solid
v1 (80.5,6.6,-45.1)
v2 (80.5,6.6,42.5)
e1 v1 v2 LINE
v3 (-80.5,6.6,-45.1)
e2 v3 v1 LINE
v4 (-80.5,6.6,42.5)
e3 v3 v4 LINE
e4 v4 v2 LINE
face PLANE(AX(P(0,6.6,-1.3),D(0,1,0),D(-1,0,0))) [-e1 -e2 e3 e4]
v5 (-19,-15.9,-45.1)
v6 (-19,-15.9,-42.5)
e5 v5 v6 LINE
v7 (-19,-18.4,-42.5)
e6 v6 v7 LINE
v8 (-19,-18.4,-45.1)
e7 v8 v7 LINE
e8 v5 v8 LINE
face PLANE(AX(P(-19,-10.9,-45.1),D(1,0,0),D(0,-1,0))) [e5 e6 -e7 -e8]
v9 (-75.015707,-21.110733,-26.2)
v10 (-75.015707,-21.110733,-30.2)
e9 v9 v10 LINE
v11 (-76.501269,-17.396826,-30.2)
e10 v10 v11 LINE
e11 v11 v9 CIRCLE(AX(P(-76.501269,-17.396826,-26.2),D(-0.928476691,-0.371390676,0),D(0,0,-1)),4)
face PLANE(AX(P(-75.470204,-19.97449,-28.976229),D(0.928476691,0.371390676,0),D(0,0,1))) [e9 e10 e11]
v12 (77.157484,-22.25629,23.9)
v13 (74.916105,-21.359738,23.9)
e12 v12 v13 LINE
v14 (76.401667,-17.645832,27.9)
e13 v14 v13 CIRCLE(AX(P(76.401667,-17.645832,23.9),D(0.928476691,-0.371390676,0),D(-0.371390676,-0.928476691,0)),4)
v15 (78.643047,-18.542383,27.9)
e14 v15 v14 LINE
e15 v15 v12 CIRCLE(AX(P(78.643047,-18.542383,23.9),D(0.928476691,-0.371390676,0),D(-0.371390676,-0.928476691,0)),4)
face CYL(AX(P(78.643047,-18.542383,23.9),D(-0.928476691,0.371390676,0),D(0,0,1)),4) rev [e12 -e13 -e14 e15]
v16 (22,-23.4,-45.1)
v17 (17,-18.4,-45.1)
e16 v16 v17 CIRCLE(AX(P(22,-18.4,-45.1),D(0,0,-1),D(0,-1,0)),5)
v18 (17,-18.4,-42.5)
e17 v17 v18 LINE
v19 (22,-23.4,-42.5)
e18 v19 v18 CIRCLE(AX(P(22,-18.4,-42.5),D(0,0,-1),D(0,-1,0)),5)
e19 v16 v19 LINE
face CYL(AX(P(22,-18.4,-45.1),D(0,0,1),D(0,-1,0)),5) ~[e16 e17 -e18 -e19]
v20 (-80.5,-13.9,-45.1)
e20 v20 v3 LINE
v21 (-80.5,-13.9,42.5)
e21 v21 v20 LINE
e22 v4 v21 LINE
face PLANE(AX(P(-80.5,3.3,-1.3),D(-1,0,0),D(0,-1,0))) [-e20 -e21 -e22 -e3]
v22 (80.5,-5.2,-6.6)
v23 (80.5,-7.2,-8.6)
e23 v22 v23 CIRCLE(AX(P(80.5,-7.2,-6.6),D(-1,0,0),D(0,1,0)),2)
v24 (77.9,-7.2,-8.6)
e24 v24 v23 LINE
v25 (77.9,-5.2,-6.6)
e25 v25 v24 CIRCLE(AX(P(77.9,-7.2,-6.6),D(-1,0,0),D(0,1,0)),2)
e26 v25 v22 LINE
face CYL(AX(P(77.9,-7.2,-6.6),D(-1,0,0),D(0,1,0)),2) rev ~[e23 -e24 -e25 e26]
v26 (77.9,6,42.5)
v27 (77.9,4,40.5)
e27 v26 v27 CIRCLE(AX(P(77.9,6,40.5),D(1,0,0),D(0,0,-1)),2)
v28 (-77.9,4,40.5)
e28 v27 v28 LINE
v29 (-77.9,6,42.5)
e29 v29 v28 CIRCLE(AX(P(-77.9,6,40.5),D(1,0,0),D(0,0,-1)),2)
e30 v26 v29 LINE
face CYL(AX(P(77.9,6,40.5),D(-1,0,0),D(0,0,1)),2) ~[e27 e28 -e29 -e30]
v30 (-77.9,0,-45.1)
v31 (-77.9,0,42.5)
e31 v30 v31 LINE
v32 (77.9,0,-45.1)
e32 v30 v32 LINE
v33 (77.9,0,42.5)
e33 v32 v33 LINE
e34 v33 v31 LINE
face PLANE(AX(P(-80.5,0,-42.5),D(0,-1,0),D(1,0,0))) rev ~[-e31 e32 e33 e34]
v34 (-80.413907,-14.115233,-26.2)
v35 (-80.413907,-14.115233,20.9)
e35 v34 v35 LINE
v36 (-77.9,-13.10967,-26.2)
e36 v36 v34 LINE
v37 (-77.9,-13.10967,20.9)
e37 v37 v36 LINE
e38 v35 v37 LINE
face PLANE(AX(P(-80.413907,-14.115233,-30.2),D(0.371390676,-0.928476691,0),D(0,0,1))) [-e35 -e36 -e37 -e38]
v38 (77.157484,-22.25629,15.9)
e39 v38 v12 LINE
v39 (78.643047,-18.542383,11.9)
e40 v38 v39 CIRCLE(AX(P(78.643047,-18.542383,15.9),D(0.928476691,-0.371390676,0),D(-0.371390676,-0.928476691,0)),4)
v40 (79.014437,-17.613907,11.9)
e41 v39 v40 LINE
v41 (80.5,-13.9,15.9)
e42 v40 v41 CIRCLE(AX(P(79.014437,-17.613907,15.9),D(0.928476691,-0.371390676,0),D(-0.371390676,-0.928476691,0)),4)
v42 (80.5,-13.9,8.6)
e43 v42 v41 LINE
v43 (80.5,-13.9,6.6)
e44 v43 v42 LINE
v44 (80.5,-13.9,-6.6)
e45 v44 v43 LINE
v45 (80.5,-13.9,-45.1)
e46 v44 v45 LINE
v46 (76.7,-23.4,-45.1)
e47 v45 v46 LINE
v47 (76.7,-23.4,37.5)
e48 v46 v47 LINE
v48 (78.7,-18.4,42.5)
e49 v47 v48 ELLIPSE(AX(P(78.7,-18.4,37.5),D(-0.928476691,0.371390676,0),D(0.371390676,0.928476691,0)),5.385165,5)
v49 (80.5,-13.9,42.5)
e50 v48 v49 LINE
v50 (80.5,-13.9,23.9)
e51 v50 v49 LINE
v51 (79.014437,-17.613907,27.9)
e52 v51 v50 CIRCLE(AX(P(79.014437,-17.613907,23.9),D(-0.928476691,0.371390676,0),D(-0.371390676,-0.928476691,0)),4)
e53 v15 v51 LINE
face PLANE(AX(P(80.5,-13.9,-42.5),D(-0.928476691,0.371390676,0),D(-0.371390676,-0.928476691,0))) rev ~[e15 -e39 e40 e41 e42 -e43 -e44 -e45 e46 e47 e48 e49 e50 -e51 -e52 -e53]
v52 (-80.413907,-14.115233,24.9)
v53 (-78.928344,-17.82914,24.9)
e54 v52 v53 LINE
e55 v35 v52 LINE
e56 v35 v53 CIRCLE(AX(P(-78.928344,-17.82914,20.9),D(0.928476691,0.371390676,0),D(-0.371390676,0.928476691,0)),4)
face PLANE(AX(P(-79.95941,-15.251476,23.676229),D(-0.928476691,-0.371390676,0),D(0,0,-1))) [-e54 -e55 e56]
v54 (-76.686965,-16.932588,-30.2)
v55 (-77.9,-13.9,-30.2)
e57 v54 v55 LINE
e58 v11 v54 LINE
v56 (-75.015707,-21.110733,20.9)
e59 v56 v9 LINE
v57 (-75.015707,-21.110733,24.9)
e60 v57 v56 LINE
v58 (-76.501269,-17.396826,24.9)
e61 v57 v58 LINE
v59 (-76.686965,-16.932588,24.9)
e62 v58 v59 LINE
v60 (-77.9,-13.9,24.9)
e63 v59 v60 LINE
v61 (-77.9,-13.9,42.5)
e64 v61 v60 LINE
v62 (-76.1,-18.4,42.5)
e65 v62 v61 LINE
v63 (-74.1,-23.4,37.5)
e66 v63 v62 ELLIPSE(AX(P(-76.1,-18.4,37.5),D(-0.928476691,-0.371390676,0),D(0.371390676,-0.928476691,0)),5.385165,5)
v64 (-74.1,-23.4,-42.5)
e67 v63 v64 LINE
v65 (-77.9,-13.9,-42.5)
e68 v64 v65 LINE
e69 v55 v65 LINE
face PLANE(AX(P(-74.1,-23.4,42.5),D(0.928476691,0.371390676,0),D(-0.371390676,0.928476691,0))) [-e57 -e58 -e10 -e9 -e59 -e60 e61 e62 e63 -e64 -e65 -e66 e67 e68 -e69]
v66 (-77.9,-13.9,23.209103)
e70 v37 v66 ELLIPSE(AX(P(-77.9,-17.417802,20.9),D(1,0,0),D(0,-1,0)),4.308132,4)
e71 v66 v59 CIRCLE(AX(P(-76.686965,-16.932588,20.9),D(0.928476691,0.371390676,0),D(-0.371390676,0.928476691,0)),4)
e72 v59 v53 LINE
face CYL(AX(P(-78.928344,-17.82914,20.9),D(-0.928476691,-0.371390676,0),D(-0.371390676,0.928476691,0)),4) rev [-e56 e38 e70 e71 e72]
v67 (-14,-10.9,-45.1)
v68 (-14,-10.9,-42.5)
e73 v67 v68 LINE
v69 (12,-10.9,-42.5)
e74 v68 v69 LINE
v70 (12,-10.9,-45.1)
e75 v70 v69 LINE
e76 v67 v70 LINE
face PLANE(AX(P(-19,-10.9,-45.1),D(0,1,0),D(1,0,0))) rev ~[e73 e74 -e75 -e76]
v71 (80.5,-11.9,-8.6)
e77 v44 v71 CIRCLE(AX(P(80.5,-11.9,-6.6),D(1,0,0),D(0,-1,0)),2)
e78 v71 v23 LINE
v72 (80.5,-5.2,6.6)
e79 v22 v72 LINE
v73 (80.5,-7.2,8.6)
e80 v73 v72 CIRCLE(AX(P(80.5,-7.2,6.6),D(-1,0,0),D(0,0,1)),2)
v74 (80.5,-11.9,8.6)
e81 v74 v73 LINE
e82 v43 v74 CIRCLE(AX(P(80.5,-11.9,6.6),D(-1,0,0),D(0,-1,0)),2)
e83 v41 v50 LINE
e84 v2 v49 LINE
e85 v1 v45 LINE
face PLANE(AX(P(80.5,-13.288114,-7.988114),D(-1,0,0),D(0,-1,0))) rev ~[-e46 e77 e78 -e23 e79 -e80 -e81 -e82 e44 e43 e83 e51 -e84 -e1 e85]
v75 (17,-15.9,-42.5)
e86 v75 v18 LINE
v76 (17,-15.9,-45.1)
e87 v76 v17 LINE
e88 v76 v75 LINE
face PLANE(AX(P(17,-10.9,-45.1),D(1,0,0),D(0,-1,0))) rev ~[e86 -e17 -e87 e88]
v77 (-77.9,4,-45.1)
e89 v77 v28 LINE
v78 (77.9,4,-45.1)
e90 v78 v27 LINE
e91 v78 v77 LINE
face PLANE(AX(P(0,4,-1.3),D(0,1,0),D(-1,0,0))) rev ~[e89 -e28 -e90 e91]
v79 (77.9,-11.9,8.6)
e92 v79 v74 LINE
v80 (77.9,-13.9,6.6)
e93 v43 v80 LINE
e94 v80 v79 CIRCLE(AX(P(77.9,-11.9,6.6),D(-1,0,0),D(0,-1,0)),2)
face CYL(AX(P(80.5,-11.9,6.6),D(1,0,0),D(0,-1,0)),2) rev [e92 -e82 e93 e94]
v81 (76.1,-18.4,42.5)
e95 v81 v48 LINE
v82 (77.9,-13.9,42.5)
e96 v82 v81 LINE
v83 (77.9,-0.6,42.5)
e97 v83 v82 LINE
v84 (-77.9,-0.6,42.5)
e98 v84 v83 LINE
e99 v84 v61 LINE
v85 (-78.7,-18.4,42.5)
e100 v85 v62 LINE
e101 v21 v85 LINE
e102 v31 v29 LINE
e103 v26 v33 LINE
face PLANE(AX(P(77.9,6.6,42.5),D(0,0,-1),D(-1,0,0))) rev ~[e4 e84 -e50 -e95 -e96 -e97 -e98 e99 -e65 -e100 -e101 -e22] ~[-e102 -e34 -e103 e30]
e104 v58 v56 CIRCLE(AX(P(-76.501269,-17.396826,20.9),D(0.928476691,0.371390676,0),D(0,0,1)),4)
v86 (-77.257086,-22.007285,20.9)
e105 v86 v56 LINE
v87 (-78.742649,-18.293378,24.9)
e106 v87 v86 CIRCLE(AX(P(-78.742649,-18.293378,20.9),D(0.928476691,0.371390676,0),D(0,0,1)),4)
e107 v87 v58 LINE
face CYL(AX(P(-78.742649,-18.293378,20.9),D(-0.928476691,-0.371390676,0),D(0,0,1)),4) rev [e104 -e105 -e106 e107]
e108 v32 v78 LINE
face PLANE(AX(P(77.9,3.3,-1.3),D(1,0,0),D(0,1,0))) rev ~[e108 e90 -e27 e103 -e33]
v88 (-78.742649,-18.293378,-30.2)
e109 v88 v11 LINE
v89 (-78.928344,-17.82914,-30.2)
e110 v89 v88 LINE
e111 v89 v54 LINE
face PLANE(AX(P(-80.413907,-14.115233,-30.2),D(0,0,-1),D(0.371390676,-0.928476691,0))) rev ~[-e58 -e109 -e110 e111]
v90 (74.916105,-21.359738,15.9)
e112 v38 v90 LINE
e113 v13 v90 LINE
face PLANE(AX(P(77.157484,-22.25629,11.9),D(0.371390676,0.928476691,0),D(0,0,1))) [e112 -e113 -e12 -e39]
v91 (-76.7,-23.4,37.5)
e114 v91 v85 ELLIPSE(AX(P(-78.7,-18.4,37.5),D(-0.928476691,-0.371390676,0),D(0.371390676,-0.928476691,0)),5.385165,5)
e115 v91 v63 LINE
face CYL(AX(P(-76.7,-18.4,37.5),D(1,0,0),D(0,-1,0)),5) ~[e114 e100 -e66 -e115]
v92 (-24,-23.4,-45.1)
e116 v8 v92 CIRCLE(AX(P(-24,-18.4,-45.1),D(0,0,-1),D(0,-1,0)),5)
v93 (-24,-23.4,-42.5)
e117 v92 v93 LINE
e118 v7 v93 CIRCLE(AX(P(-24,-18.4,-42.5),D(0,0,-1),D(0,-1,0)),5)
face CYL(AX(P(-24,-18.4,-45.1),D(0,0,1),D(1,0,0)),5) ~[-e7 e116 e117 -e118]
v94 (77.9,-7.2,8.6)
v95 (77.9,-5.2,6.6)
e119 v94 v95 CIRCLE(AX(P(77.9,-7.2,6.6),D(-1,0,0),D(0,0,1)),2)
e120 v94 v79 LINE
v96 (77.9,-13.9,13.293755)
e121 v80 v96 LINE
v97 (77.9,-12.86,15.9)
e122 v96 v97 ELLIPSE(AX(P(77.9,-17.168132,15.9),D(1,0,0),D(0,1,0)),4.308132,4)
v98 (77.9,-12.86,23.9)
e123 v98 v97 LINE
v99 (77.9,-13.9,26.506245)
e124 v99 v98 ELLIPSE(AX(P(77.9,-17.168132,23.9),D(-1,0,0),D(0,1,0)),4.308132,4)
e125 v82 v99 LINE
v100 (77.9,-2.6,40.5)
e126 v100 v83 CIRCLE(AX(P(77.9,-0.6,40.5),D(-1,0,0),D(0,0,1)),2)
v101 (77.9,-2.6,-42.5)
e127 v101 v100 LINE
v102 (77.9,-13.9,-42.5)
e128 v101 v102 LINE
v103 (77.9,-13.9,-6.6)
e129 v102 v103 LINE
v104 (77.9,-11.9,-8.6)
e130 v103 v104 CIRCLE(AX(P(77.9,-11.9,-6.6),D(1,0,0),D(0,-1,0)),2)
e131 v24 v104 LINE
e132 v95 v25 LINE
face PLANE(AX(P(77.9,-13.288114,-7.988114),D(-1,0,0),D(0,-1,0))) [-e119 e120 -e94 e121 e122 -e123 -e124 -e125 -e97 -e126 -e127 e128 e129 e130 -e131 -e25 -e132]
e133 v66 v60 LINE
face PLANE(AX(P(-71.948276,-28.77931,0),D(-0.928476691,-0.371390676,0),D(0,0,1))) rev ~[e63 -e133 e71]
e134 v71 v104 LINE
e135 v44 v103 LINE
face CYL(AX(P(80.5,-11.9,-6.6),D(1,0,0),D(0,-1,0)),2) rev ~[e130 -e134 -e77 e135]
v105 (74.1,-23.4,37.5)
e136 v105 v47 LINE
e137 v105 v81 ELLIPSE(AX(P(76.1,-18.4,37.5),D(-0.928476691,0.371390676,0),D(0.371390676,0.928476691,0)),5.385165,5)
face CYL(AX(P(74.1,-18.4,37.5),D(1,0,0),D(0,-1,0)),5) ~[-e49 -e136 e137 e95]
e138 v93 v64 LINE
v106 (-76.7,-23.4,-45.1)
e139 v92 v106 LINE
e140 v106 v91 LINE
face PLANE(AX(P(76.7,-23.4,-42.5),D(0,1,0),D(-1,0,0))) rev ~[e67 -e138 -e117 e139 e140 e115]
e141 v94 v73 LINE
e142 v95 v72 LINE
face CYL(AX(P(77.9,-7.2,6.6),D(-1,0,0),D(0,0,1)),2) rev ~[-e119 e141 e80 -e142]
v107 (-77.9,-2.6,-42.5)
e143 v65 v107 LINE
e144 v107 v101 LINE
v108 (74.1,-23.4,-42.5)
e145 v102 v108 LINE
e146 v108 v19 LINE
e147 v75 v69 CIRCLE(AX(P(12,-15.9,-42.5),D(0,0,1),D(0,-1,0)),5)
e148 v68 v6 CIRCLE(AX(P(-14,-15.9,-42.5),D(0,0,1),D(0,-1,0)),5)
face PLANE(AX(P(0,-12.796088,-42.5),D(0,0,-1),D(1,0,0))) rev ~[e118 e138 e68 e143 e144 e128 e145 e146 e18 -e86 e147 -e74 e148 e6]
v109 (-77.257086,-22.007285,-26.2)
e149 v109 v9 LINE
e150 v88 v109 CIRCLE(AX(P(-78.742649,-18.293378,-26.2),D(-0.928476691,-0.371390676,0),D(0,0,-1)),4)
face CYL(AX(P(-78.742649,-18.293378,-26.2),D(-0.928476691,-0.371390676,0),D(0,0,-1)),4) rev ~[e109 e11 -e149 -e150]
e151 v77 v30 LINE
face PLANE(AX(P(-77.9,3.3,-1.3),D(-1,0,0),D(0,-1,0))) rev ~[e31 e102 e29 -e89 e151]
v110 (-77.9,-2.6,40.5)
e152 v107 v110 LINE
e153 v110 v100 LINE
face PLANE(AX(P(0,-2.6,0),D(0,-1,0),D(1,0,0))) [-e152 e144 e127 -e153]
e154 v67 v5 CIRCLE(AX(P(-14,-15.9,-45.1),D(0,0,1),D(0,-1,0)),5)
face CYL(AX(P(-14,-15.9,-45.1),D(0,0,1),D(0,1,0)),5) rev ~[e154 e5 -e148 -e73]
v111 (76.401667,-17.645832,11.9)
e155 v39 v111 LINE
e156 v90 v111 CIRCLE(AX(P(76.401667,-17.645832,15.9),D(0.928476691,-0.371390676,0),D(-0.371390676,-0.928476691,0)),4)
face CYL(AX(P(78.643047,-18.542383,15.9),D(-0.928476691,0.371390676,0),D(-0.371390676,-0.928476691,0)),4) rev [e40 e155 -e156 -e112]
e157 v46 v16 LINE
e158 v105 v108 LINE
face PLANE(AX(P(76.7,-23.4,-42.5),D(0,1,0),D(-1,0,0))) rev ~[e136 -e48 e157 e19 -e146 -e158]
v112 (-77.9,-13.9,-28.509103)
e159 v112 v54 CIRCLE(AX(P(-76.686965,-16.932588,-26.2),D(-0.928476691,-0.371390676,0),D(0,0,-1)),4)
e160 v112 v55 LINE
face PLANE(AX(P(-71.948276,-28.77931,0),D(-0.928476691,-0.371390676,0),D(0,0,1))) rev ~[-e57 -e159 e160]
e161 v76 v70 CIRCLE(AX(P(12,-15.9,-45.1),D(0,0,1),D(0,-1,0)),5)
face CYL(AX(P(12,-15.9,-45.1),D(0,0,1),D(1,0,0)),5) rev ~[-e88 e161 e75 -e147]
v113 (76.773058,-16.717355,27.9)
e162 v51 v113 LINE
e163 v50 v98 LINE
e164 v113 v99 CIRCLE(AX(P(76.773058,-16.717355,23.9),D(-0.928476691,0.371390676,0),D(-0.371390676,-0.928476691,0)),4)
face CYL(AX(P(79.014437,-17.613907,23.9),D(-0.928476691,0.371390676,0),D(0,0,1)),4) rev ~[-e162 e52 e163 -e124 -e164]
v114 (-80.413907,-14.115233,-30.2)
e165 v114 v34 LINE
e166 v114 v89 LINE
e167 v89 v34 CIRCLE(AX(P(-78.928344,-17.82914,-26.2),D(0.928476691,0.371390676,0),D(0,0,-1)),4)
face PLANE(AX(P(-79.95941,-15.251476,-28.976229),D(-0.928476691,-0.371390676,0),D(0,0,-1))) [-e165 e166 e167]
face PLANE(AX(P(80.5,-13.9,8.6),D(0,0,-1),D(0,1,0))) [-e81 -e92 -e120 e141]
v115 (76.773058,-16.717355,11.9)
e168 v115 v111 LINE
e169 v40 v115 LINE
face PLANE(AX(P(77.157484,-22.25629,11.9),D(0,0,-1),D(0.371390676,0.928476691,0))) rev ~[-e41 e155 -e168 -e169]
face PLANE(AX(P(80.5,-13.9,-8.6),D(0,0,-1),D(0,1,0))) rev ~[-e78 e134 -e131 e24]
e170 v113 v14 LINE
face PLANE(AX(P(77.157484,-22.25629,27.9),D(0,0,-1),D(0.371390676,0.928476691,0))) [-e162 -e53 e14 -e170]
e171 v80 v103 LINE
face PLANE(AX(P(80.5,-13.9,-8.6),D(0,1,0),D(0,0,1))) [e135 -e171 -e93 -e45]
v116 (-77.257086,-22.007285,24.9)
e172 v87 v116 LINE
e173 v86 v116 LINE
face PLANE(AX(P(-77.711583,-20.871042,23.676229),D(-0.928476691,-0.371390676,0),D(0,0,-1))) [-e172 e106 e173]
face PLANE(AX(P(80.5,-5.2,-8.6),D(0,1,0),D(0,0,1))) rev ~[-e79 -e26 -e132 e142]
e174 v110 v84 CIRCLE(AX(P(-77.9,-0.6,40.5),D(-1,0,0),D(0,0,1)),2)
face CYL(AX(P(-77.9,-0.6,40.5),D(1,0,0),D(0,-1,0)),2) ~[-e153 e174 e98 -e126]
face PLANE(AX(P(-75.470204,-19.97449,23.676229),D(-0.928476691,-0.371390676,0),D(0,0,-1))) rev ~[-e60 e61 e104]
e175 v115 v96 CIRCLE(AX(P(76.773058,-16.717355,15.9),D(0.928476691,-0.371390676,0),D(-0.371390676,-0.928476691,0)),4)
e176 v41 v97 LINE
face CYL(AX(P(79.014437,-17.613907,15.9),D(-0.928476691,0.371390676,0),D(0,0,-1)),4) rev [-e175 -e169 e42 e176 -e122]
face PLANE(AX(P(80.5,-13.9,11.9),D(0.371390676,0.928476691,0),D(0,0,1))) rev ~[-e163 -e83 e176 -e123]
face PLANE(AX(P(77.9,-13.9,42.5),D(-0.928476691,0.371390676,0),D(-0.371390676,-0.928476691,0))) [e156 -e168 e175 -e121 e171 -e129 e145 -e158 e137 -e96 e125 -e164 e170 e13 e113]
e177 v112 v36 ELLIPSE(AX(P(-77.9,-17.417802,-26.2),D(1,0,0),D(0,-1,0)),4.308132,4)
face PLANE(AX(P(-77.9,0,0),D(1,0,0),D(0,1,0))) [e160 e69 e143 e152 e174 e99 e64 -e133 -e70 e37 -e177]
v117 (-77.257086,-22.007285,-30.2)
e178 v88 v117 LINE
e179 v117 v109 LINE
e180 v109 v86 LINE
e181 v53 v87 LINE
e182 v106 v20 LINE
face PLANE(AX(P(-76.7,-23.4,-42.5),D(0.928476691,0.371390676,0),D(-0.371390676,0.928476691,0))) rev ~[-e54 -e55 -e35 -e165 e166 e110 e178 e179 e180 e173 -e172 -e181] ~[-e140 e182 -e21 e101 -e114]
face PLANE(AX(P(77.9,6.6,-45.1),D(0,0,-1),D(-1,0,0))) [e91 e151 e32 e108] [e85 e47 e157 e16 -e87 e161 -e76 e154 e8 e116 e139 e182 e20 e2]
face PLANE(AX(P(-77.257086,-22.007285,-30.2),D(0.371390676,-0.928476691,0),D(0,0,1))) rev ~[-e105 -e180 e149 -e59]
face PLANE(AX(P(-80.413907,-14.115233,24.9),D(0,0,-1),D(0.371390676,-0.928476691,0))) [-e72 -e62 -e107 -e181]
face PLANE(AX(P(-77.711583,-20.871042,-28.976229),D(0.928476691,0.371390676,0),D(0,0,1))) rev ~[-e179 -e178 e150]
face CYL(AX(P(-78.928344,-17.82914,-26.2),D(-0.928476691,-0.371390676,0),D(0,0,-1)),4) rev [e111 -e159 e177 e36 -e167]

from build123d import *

# Parameters (mm, degrees)
F0_W          = 155.8
F0_H          = 85
F1_DEPTH      = 2.6
F3_DEPTH      = 85
F5_DEPTH      = 2.6
F6_W          = 8.7
F6_H          = 17.2
F7_DEPTH      = 25
F8_W          = 9
F8_H          = 16
F9_DEPTH      = 25
F10_W         = 8.5
F10_H         = 55.1
F11_DEPTH     = 25
F12_W         = 6.6
F12_H         = 87.6
F13_DEPTH     = 2.6
F14_W         = 6.6
F14_H         = 87.6
F15_DEPTH     = 2.6
F16_W         = 155.8
F16_H         = 87.6
F17_DEPTH     = 2.6
F19_W         = 36
F19_H         = 12.5
F20_DEPTH     = 25
F21_T1_DEPTH  = 2.4140393963
F21_T6_DEPTH  = 12.7075604463
F21_T12_DEPTH = 12.7075604463
F21_T18_DEPTH = 12.7075604463
F21_T24_DEPTH = 12.7075604463
F21_T30_DEPTH = 12.7075604463
F21_T36_DEPTH = 12.7075604463
F22_R         = 4
F23_T1_DEPTH  = 2.6
F23_T6_DEPTH  = 2.6
F23_T12_DEPTH = 2.6
F23_T17_DEPTH = 2.6
F23_T23_DEPTH = 2.6
F24_R         = 5
F25_R         = 2
F26_R         = 5


# Not quite as in the source:
# - a fillet or chamfer that OpenCascade refuses, or shapes differently, is made with other operations: its cross-section is extruded or revolved along the edge and cut away or added


with BuildPart() as f1:
    # F0 (on Front) → F1 (new body)
    with BuildSketch(Plane.XZ):
        Rectangle(F0_W, F0_H)
    extrude(amount=F1_DEPTH)

    # F2 (on face) → F3 (join)
    with BuildSketch(Plane.XY.offset(42.5)):
        Polygon((-77.9, -13.9), (-77.9, -2.6), (-77.9, 0), (-80.5, 0), (-80.5, -13.9), align=None)
        Polygon((-74.1, -23.4), (-77.9, -13.9), (-80.5, -13.9), (-76.7, -23.4), align=None)
        Polygon((77.9, 0), (77.9, -2.6), (77.9, -13.9), (74.1, -23.4), (76.7, -23.4), (80.5, -13.9), (80.5, 0), align=None)
    extrude(amount=-F3_DEPTH)

    # F4 (on face) → F5 (join)
    with BuildSketch(Plane(origin=(0, 0, -42.5), x_dir=(1, 0, 0), z_dir=(0, 0, -1))):
        Polygon((74.1, 23.4), (-74.1, 23.4), (-77.9, 13.9), (-77.9, 2.6), (77.9, 2.6), (77.9, 13.9), align=None)
        Polygon((-77.9, 13.9), (-74.1, 23.4), (-76.7, 23.4), (-80.5, 13.9), (-80.5, 0), (80.5, 0), (80.5, 13.9), (76.7, 23.4), (74.1, 23.4), (77.9, 13.9), (77.9, 2.6), (-77.9, 2.6), align=None)
    extrude(amount=F5_DEPTH)

    # F6 (on face) → F7 (cut)
    with BuildSketch(Plane.YZ.offset(80.5)):
        with Locations((-9.55, 0)):
            Rectangle(F6_W, F6_H)
    extrude(amount=-F7_DEPTH, mode=Mode.SUBTRACT)

    # F8 (on face) → F9 (cut)
    with BuildSketch(Plane(origin=(74.1896551724, -29.675862069, 0), x_dir=(0.3713906764, 0.9284766909, 0), z_dir=(0.9284766909, -0.3713906764, 0))):
        with Locations((12.4911234432, 19.9)):
            Rectangle(F8_W, F8_H)
    extrude(amount=-F9_DEPTH, mode=Mode.SUBTRACT)

    # F10 (on face) → F11 (cut)
    with BuildSketch(Plane(origin=(-74.1896551724, -29.675862069, 0), x_dir=(0.3713906764, -0.9284766909, 0), z_dir=(-0.9284766909, -0.3713906764, 0))):
        with Locations((-12.5093103096, -2.65)):
            Rectangle(F10_W, F10_H)
    extrude(amount=-F11_DEPTH, mode=Mode.SUBTRACT)

    # F12 (on face) → F13 (join)
    with BuildSketch(Plane(origin=(-80.5, 0, 0), x_dir=(0, -1, 0), z_dir=(-1, 0, 0))):
        with Locations((-3.3, -1.3)):
            Rectangle(F12_W, F12_H)
    extrude(amount=-F13_DEPTH)

    # F14 (on face) → F15 (join)
    with BuildSketch(Plane.YZ.offset(80.5)):
        with Locations((3.3, -1.3)):
            Rectangle(F14_W, F14_H)
    extrude(amount=-F15_DEPTH)

    # F16 (on face) → F17 (join)
    with BuildSketch(Plane(origin=(0, 6.6, 0), x_dir=(-1, 0, 0), z_dir=(0, 1, 0))):
        with Locations((0, -1.3)):
            Rectangle(F16_W, F16_H)
    extrude(amount=-F17_DEPTH)

    # F18: union 

    # F19 (on face) → F20 (cut)
    with BuildSketch(Plane(origin=(0, 0, -45.1), x_dir=(1, 0, 0), z_dir=(0, 0, -1))):
        with Locations((-1, 17.15)):
            Rectangle(F19_W, F19_H)
    extrude(amount=-F20_DEPTH, mode=Mode.SUBTRACT)

    # F21: fillet of radius 4 on 4 edges, made by hand

    # F21_s2 → F21_t1 (join)
    with BuildSketch(Plane(origin=(-74.1896551724, -29.675862069, 0), x_dir=(0, 0, 1), z_dir=(0.9284766909, 0.3713906764, 0))):
        with BuildLine():
            ThreePointArc((-30.2, -12.2593103096), (-29.0284271247, -9.4308831849), (-26.2, -8.2593103096))
            Line((-26.2, -8.2593103096), (-30.2, -8.2593103096))
            Line((-30.2, -8.2593103096), (-30.2, -12.2593103096))
        make_face()
        with BuildLine():
            ThreePointArc((24.9, -12.2593103096), (23.7284271247, -9.4308831849), (20.9, -8.2593103096))
            Line((20.9, -8.2593103096), (24.9, -8.2593103096))
            Line((24.9, -8.2593103096), (24.9, -12.2593103096))
        make_face()
    extrude(amount=F21_T1_DEPTH)


with BuildPart() as f21_tool4:
    # F21_s5 → F21_t6 (new body)
    with BuildSketch(Plane(origin=(-74.1896551724, -29.675862069, 0), x_dir=(0, 0, 1), z_dir=(0.9284766909, 0.3713906764, 0))):
        with BuildLine():
            ThreePointArc((-30.2, -12.7593103096), (-29.0284271247, -15.5877374344), (-26.2, -16.7593103096))
            Line((-26.2, -16.7593103096), (-30.2, -16.7593103096))
            Line((-30.2, -16.7593103096), (-30.2, -12.7593103096))
        make_face()
    extrude(amount=F21_T6_DEPTH)

    split(bisect_by=Plane.YZ.offset(-77.9), keep=Keep.BOTTOM)

    split(bisect_by=Plane(origin=(-71.9482758621, -28.7793103448, 0), x_dir=(0, 0, 1), z_dir=(-0.9284766909, -0.3713906764, 0)), keep=Keep.TOP)


with BuildPart() as f1_1:
    add(f1.part)

    # F21_t3: union F21_tool4
    add(f21_tool4.part)


with BuildPart() as f21_tool10:
    # F21_s11 → F21_t12 (new body)
    with BuildSketch(Plane(origin=(-74.1896551724, -29.675862069, 0), x_dir=(0, 0, 1), z_dir=(0.9284766909, 0.3713906764, 0))):
        with BuildLine():
            ThreePointArc((-30.2, -12.7593103096), (-29.0284271247, -15.5877374344), (-26.2, -16.7593103096))
            Line((-26.2, -16.7593103096), (-30.2, -16.7593103096))
            Line((-30.2, -16.7593103096), (-30.2, -12.7593103096))
        make_face()
    extrude(amount=F21_T12_DEPTH)

    split(bisect_by=Plane.YZ.offset(-77.9), keep=Keep.BOTTOM)

    split(bisect_by=Plane(origin=(-71.9482758621, -28.7793103448, 0), x_dir=(0, 0, 1), z_dir=(0.9284766909, 0.3713906764, 0)), keep=Keep.TOP)


with BuildPart() as f1_2:
    add(f1_1.part)

    # F21_t9: union F21_tool10
    add(f21_tool10.part)


with BuildPart() as f21_tool16:
    # F21_s17 → F21_t18 (new body)
    with BuildSketch(Plane(origin=(-74.1896551724, -29.675862069, 0), x_dir=(0, 0, 1), z_dir=(0.9284766909, 0.3713906764, 0))):
        with BuildLine():
            ThreePointArc((-30.2, -12.7593103096), (-29.0284271247, -15.5877374344), (-26.2, -16.7593103096))
            Line((-26.2, -16.7593103096), (-30.2, -16.7593103096))
            Line((-30.2, -16.7593103096), (-30.2, -12.7593103096))
        make_face()
    extrude(amount=F21_T18_DEPTH)

    split(bisect_by=Plane.YZ.offset(-77.9), keep=Keep.TOP)

    split(bisect_by=Plane(origin=(-71.9482758621, -28.7793103448, 0), x_dir=(0, 0, 1), z_dir=(-0.9284766909, -0.3713906764, 0)), keep=Keep.TOP)


with BuildPart() as f1_3:
    add(f1_2.part)

    # F21_t15: union F21_tool16
    add(f21_tool16.part)


with BuildPart() as f21_tool22:
    # F21_s23 → F21_t24 (new body)
    with BuildSketch(Plane(origin=(-74.1896551724, -29.675862069, 0), x_dir=(0, 0, 1), z_dir=(0.9284766909, 0.3713906764, 0))):
        with BuildLine():
            ThreePointArc((20.9, -16.7593103096), (23.7284271247, -15.5877374344), (24.9, -12.7593103096))
            Line((24.9, -12.7593103096), (24.9, -16.7593103096))
            Line((24.9, -16.7593103096), (20.9, -16.7593103096))
        make_face()
    extrude(amount=F21_T24_DEPTH)

    split(bisect_by=Plane.YZ.offset(-77.9), keep=Keep.BOTTOM)

    split(bisect_by=Plane(origin=(-71.9482758621, -28.7793103448, 0), x_dir=(0, 0, 1), z_dir=(-0.9284766909, -0.3713906764, 0)), keep=Keep.TOP)


with BuildPart() as f1_4:
    add(f1_3.part)

    # F21_t21: union F21_tool22
    add(f21_tool22.part)


with BuildPart() as f21_tool28:
    # F21_s29 → F21_t30 (new body)
    with BuildSketch(Plane(origin=(-74.1896551724, -29.675862069, 0), x_dir=(0, 0, 1), z_dir=(0.9284766909, 0.3713906764, 0))):
        with BuildLine():
            ThreePointArc((20.9, -16.7593103096), (23.7284271247, -15.5877374344), (24.9, -12.7593103096))
            Line((24.9, -12.7593103096), (24.9, -16.7593103096))
            Line((24.9, -16.7593103096), (20.9, -16.7593103096))
        make_face()
    extrude(amount=F21_T30_DEPTH)

    split(bisect_by=Plane.YZ.offset(-77.9), keep=Keep.TOP)

    split(bisect_by=Plane(origin=(-71.9482758621, -28.7793103448, 0), x_dir=(0, 0, 1), z_dir=(-0.9284766909, -0.3713906764, 0)), keep=Keep.TOP)


with BuildPart() as f1_5:
    add(f1_4.part)

    # F21_t27: union F21_tool28
    add(f21_tool28.part)


with BuildPart() as f21_tool34:
    # F21_s35 → F21_t36 (new body)
    with BuildSketch(Plane(origin=(-74.1896551724, -29.675862069, 0), x_dir=(0, 0, 1), z_dir=(0.9284766909, 0.3713906764, 0))):
        with BuildLine():
            ThreePointArc((20.9, -16.7593103096), (23.7284271247, -15.5877374344), (24.9, -12.7593103096))
            Line((24.9, -12.7593103096), (24.9, -16.7593103096))
            Line((24.9, -16.7593103096), (20.9, -16.7593103096))
        make_face()
    extrude(amount=F21_T36_DEPTH)

    split(bisect_by=Plane.YZ.offset(-77.9), keep=Keep.BOTTOM)

    split(bisect_by=Plane(origin=(-71.9482758621, -28.7793103448, 0), x_dir=(0, 0, 1), z_dir=(0.9284766909, 0.3713906764, 0)), keep=Keep.TOP)


with BuildPart() as f1_6:
    add(f1_5.part)

    # F21_t33: union F21_tool34
    add(f21_tool34.part)

    # F22 (call 1 of 4: OpenCascade refuses the feature's edges together)
    f22_edges = [f1_6.edges().sort_by_distance(p)[0] for p in [
        (76.036794, -21.808014, 11.9),
    ]]
    fillet(f22_edges, radius=F22_R)

    # F22#2 (call 2 of 4)
    f22_2_edges = [f1_6.edges().sort_by_distance(p)[0] for p in [
        (79.2, -13.38, 11.9),
    ]]
    fillet(f22_2_edges, radius=F22_R)

    # F22#3 (call 3 of 4)
    f22_3_edges = [f1_6.edges().sort_by_distance(p)[0] for p in [
        (76.036794, -21.808014, 27.9),
    ]]
    fillet(f22_3_edges, radius=F22_R)

    # F22#4 (call 4 of 4)
    f22_4_edges = [f1_6.edges().sort_by_distance(p)[0] for p in [
        (79.2, -13.38, 27.9),
    ]]
    fillet(f22_4_edges, radius=F22_R)

    # F23: fillet of radius 2 on 4 edges, made by hand

    # F23_s2 → F23_t1 (join)
    with BuildSketch(Plane.YZ.offset(77.9)):
        with BuildLine():
            ThreePointArc((-7.2, 8.6), (-5.7857864376, 8.0142135624), (-5.2, 6.6))
            Line((-5.2, 6.6), (-5.2, 8.6))
            Line((-5.2, 8.6), (-7.2, 8.6))
        make_face()
        with BuildLine():
            ThreePointArc((-5.2, -6.6), (-5.7857864376, -8.0142135624), (-7.2, -8.6))
            Line((-7.2, -8.6), (-5.2, -8.6))
            Line((-5.2, -8.6), (-5.2, -6.6))
        make_face()
    extrude(amount=F23_T1_DEPTH)


with BuildPart() as f23_tool4:
    # F23_s5 → F23_t6 (new body)
    with BuildSketch(Plane.YZ.offset(80.5)):
        with BuildLine():
            ThreePointArc((-13.9, 6.6), (-13.3142135624, 8.0142135624), (-11.9, 8.6))
            Line((-11.9, 8.6), (-13.9, 8.6))
            Line((-13.9, 8.6), (-13.9, 6.6))
        make_face()
    extrude(amount=-F23_T6_DEPTH)

    split(bisect_by=Plane(origin=(74.1896551724, -29.675862069, 0), x_dir=(0, 0, 1), z_dir=(-0.9284766909, 0.3713906764, 0)), keep=Keep.TOP)

    split(bisect_by=Plane(origin=(71.9482758621, -28.7793103448, 0), x_dir=(0, 0, 1), z_dir=(0.9284766909, -0.3713906764, 0)), keep=Keep.TOP)


with BuildPart() as f1_7:
    add(f1_6.part)

    # F23_t3: union F23_tool4
    add(f23_tool4.part)


with BuildPart() as f23_tool10:
    # F23_s11 → F23_t12 (new body)
    with BuildSketch(Plane.YZ.offset(80.5)):
        with BuildLine():
            ThreePointArc((-13.9, 6.6), (-13.3142135624, 8.0142135624), (-11.9, 8.6))
            Line((-11.9, 8.6), (-13.9, 8.6))
            Line((-13.9, 8.6), (-13.9, 6.6))
        make_face()
    extrude(amount=-F23_T12_DEPTH)

    split(bisect_by=Plane(origin=(71.9482758621, -28.7793103448, 0), x_dir=(0, 0, 1), z_dir=(-0.9284766909, 0.3713906764, 0)), keep=Keep.TOP)


with BuildPart() as f1_8:
    add(f1_7.part)

    # F23_t9: union F23_tool10
    add(f23_tool10.part)


with BuildPart() as f23_tool15:
    # F23_s16 → F23_t17 (new body)
    with BuildSketch(Plane.YZ.offset(80.5)):
        with BuildLine():
            ThreePointArc((-13.9, -6.6), (-13.3142135624, -8.0142135624), (-11.9, -8.6))
            Line((-11.9, -8.6), (-13.9, -8.6))
            Line((-13.9, -8.6), (-13.9, -6.6))
        make_face()
    extrude(amount=-F23_T17_DEPTH)

    split(bisect_by=Plane(origin=(74.1896551724, -29.675862069, 0), x_dir=(0, 0, 1), z_dir=(-0.9284766909, 0.3713906764, 0)), keep=Keep.TOP)

    split(bisect_by=Plane(origin=(71.9482758621, -28.7793103448, 0), x_dir=(0, 0, 1), z_dir=(0.9284766909, -0.3713906764, 0)), keep=Keep.TOP)


with BuildPart() as f1_9:
    add(f1_8.part)

    # F23_t14: union F23_tool15
    add(f23_tool15.part)


with BuildPart() as f23_tool21:
    # F23_s22 → F23_t23 (new body)
    with BuildSketch(Plane.YZ.offset(80.5)):
        with BuildLine():
            ThreePointArc((-13.9, -6.6), (-13.3142135624, -8.0142135624), (-11.9, -8.6))
            Line((-11.9, -8.6), (-13.9, -8.6))
            Line((-13.9, -8.6), (-13.9, -6.6))
        make_face()
    extrude(amount=-F23_T23_DEPTH)

    split(bisect_by=Plane(origin=(71.9482758621, -28.7793103448, 0), x_dir=(0, 0, 1), z_dir=(-0.9284766909, 0.3713906764, 0)), keep=Keep.TOP)


with BuildPart() as f1_10:
    add(f1_9.part)

    # F23_t20: union F23_tool21
    add(f23_tool21.part)

    # F24
    f24_edges = [f1_10.edges().sort_by_distance(p)[0] for p in [
        (17, -10.9, -43.8),
        (-19, -10.9, -43.8),
        (17, -23.4, -43.8),
        (-19, -23.4, -43.8),
    ]]
    fillet(f24_edges, radius=F24_R)

    # F25
    f25_edges = [f1_10.edges().sort_by_distance(p)[0] for p in [
        (0, -2.6, 42.5),
        (0, 4, 42.5),
    ]]
    fillet(f25_edges, radius=F25_R)

    # F26
    f26_edges = [f1_10.edges().sort_by_distance(p)[0] for p in [
        (-75.4, -23.4, 42.5),
        (75.4, -23.4, 42.5),
    ]]
    fillet(f26_edges, radius=F26_R)


solid = f1_10.part
